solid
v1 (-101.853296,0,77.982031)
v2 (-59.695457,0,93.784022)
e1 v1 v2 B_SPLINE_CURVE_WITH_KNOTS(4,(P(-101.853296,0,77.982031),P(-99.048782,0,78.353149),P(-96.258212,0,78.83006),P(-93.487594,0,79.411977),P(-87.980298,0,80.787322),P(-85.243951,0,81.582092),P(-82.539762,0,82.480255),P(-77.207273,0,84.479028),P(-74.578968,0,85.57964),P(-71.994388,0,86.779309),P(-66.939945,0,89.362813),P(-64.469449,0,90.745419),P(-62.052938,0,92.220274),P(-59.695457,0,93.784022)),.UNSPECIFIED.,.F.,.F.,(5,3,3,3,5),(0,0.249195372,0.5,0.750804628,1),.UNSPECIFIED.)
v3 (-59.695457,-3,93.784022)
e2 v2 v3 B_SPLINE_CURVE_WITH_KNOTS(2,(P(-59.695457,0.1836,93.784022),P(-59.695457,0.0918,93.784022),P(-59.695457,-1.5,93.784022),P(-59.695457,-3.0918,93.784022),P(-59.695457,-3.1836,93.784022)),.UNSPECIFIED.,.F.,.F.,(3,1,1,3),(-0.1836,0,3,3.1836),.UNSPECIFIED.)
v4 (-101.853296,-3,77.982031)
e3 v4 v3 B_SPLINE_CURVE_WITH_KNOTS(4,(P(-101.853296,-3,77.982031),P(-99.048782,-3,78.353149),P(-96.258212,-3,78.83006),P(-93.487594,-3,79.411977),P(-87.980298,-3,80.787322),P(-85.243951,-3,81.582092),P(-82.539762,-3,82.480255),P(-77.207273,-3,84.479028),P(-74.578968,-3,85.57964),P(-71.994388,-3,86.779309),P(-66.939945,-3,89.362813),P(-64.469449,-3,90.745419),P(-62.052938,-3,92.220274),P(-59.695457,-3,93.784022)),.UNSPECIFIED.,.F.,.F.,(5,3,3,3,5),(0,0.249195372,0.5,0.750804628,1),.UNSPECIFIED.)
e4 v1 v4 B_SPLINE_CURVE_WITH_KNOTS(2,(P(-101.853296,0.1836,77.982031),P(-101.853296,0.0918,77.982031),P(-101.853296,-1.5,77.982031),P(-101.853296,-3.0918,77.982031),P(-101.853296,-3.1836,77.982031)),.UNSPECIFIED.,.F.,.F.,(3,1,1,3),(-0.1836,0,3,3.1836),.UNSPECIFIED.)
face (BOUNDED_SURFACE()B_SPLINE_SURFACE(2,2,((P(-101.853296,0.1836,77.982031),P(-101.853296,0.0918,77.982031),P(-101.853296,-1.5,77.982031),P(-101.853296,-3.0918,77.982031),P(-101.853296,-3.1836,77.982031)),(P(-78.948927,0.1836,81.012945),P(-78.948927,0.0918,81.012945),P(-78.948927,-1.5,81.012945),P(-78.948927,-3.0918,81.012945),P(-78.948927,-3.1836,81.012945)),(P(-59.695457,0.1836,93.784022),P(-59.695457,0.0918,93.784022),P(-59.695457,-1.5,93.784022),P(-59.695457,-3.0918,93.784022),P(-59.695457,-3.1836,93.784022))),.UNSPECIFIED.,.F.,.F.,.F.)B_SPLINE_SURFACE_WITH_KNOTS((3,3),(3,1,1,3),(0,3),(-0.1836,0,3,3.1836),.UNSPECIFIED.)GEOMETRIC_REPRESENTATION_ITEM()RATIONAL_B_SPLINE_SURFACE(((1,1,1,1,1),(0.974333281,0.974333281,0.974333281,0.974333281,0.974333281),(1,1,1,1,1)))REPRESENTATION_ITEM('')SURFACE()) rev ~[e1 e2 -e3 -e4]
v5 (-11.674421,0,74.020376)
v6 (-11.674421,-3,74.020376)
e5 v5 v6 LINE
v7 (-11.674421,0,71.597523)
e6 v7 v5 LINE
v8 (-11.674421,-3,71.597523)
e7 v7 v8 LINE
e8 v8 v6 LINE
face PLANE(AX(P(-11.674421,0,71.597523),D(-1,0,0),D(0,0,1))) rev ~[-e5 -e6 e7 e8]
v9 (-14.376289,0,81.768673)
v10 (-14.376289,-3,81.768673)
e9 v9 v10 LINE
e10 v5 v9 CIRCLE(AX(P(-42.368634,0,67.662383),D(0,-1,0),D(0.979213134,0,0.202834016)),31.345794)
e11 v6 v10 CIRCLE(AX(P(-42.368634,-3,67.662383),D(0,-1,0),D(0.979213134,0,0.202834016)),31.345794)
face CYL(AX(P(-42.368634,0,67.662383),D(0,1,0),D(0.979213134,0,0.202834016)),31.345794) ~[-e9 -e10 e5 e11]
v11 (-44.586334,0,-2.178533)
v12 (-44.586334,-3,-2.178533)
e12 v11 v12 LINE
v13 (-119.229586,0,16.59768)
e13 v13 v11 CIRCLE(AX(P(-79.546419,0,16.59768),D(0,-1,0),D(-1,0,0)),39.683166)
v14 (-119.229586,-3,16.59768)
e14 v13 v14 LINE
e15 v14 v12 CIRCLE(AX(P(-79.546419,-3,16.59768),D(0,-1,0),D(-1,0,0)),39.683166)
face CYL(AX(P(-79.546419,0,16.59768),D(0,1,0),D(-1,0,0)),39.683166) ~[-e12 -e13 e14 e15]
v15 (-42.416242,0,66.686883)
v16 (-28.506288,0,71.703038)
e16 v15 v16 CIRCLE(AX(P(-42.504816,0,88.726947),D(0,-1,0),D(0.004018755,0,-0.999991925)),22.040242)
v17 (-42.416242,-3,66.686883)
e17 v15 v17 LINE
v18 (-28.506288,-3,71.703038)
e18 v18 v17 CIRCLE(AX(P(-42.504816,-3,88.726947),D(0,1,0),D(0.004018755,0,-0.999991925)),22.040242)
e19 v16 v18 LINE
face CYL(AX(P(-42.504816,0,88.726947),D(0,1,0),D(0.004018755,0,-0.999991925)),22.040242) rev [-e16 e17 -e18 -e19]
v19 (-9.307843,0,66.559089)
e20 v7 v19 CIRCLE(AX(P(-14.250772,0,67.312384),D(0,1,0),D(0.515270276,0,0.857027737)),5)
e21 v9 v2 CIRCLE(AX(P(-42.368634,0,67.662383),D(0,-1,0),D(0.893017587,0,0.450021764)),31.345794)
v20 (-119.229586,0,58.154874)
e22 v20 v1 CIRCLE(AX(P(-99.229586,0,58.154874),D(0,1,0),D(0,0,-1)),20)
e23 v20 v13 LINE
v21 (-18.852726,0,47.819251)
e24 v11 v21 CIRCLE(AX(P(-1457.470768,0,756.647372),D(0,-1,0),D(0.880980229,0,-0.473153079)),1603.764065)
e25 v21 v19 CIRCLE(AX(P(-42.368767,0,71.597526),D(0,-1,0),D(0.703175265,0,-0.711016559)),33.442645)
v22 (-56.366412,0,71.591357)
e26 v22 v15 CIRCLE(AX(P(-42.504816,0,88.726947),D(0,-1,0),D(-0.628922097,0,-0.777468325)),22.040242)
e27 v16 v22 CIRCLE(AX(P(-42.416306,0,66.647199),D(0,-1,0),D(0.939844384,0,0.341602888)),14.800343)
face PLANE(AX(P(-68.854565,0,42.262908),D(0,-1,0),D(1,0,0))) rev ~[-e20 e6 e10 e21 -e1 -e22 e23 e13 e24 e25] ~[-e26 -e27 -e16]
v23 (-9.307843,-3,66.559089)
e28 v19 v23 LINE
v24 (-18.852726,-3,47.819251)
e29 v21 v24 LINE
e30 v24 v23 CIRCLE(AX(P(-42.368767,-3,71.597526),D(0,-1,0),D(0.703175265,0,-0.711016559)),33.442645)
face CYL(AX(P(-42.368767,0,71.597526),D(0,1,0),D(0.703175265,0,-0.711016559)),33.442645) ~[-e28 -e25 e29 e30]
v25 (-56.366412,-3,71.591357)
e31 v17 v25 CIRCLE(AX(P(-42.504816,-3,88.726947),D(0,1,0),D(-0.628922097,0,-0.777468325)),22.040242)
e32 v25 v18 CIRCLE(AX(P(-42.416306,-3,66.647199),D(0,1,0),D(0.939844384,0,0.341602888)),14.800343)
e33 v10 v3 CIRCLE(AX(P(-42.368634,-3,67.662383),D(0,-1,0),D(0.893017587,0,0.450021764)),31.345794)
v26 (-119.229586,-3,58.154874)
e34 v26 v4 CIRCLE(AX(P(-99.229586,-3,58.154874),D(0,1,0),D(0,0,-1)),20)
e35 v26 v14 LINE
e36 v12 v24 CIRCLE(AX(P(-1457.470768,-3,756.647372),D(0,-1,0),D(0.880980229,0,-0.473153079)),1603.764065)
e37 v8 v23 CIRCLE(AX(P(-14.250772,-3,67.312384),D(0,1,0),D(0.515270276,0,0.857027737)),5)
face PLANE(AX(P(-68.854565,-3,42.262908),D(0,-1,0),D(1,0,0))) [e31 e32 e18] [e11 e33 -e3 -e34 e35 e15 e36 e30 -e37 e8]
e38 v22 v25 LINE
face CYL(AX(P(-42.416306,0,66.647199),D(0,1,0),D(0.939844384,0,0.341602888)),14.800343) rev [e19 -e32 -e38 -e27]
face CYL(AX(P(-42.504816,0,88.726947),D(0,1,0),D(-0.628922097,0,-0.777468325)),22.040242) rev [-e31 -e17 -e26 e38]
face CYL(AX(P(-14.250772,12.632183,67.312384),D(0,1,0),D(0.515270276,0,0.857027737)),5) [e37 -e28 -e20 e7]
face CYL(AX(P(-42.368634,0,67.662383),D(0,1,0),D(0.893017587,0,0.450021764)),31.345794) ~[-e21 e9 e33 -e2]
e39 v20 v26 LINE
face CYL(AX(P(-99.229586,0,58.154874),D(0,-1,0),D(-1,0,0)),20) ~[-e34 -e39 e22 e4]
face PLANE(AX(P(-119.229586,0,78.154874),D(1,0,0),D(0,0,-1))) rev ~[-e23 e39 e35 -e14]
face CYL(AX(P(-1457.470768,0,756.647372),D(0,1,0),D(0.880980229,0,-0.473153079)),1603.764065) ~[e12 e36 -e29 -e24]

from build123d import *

# Parameters (mm, degrees)
F1_DEPTH    = 3
F2_DEPTH    = 25
F3_R        = 20
F4_R        = 100
F5_T1_DEPTH = 28.2643660281


# Not quite as in the source:
# - a fillet or chamfer that OpenCascade refuses, or shapes differently, is made with other operations: its cross-section is extruded or revolved along the edge and cut away or added


with BuildPart() as f1:
    # F0 (on Front) → F1 (new body)
    with BuildSketch(Plane.XZ):
        with BuildLine():
            ThreePointArc((-119.2295857728, 16.5976797057), (-89.2269882152, -21.8866064143), (-44.5863344816, -2.1785326218))
            ThreePointArc((-44.5863344816, -2.1785326218), (-31.5003837254, 22.7075657451), (-18.8527258188, 47.819251244))
            ThreePointArc((-18.8527258188, 47.819251244), (-11.5073907558, 58.7139707042), (-8.9261215756, 71.5975225718))
            Line((-8.9261215756, 71.5975225718), (-11.67442069, 71.5975225718))
            Line((-11.67442069, 71.5975225718), (-11.67442069, 74.0203762137))
            ThreePointArc((-11.67442069, 74.0203762137), (-12.7707106261, 77.9833199576), (-14.3762885703, 81.7686725444))
            ThreePointArc((-14.3762885703, 81.7686725444), (-44.33377908, 98.9465167224), (-71.9061774941, 78.1548738354))
            Line((-71.9061774941, 78.1548738354), (-107.2845857728, 78.1548738354))
            Line((-107.2845857728, 78.1548738354), (-119.2295857728, 78.1548738354))
            Line((-119.2295857728, 78.1548738354), (-119.2295857728, 66.2098738354))
            Line((-119.2295857728, 66.2098738354), (-119.2295857728, 16.5976797057))
        make_face()
        with BuildLine():
            ThreePointArc((-26.6928125913, 79.0930187933), (-24.6315082315, 75.5227380173), (-23.3711215756, 71.597523888))
            Line((-23.3711215756, 71.597523888), (-20.8711215756, 71.5975236602))
            ThreePointArc((-20.8711215756, 71.5975236602), (-22.8939959961, 62.4935676044), (-28.5819229469, 55.1029300277))
            ThreePointArc((-28.5819229469, 55.1029300277), (-41.6104278008, 29.1671780434), (-55.1096433175, 3.4732809051))
            ThreePointArc((-55.1096433175, 3.4732809051), (-86.3130475025, -10.3024804429), (-107.2845857728, 16.5976797057))
            Line((-107.2845857728, 16.5976797057), (-107.2845857728, 66.2098738354))
            Line((-107.2845857728, 66.2098738354), (-104.7845857728, 66.2098738354))
            Line((-104.7845857728, 66.2098738354), (-68.5864427672, 66.2098738354))
            Line((-68.5864427672, 66.2098738354), (-63.1803487139, 66.2098738354))
            ThreePointArc((-63.1803487139, 66.2098738354), (-63.6941147242, 68.8812286524), (-63.8664115811, 71.5960777945))
            Line((-63.8664115811, 71.5960777945), (-61.3664115868, 71.5962461647))
            ThreePointArc((-61.3664115868, 71.5962461647), (-46.4685424734, 86.625019162), (-26.6928125913, 79.0930187933))
        make_face(mode=Mode.SUBTRACT)
        with BuildLine():
            ThreePointArc((-32.7025071715, 52.3956462756), (-51.243606048, 52.0172813271), (-63.1803487139, 66.2098738354))
            Line((-63.1803487139, 66.2098738354), (-68.5864427672, 66.2098738354))
            Line((-68.5864427672, 66.2098738354), (-104.7845857728, 66.2098738354))
            Line((-104.7845857728, 66.2098738354), (-104.7845857728, 16.5976797057))
            ThreePointArc((-104.7845857728, 16.5976797057), (-85.7031813006, -7.8780087034), (-57.3120938901, 4.6561636023))
            ThreePointArc((-57.3120938901, 4.6561636023), (-44.8056231456, 28.4219407394), (-32.7025071715, 52.3956462756))
        make_face()
        with BuildLine():
            ThreePointArc((-61.3664115868, 71.5962461647), (-42.368127741, 52.5998806027), (-23.3711215756, 71.597523888))
            Line((-23.3711215756, 71.597523888), (-28.5062876117, 71.7030383349))
            ThreePointArc((-28.5062876117, 71.7030383348), (-35.0280474509, 67.9936357913), (-42.4162418184, 66.6868830916))
            ThreePointArc((-42.4162418184, 66.6868830916), (-49.8149115034, 67.9342855665), (-56.3664115866, 71.5913571683))
            Line((-56.3664115866, 71.5913571683), (-61.3664115868, 71.5962461647))
        make_face()
        with BuildLine():
            ThreePointArc((-55.1096433175, 3.4732809051), (-41.6104278008, 29.1671780434), (-28.5819229469, 55.1029300277))
            ThreePointArc((-28.5819229469, 55.1029300277), (-30.5643455059, 53.6307678626), (-32.7025071715, 52.3956462756))
            ThreePointArc((-32.7025071715, 52.3956462756), (-44.8056231456, 28.4219407394), (-57.3120938901, 4.6561636023))
            ThreePointArc((-57.3120938901, 4.6561636023), (-85.7031813006, -7.8780087034), (-104.7845857728, 16.5976797057))
            Line((-104.7845857728, 16.5976797057), (-104.7845857728, 66.2098738354))
            Line((-104.7845857728, 66.2098738354), (-107.2845857728, 66.2098738354))
            Line((-107.2845857728, 66.2098738354), (-107.2845857728, 16.5976797057))
            ThreePointArc((-107.2845857728, 16.5976797057), (-86.3130475025, -10.3024804429), (-55.1096433175, 3.4732809051))
        make_face()
        with BuildLine():
            ThreePointArc((-42.4162418184, 66.6868830916), (-35.0280474509, 67.9936357913), (-28.5062876117, 71.7030383348))
            ThreePointArc((-28.5062876117, 71.7030383349), (-42.4756351565, 81.447422187), (-56.3664115866, 71.5913571683))
            ThreePointArc((-56.3664115866, 71.5913571683), (-49.8149115034, 67.9342855665), (-42.4162418184, 66.6868830916))
        make_face()
        with BuildLine():
            Line((-28.5062876117, 71.7030383349), (-23.3711215756, 71.597523888))
            ThreePointArc((-23.3711215756, 71.597523888), (-24.6315082315, 75.5227380173), (-26.6928125913, 79.0930187933))
            ThreePointArc((-26.6928125913, 79.0930187933), (-46.4685424734, 86.625019162), (-61.3664115868, 71.5962461647))
            Line((-61.3664115868, 71.5962461647), (-56.3664115866, 71.5913571683))
            ThreePointArc((-56.3664115866, 71.5913571683), (-42.4756351565, 81.447422187), (-28.5062876117, 71.7030383349))
        make_face()
        with BuildLine():
            Line((-20.8711215756, 71.5975236602), (-23.3711215756, 71.597523888))
            ThreePointArc((-23.3711215756, 71.597523888), (-42.368127741, 52.5998806027), (-61.3664115868, 71.5962461647))
            Line((-61.3664115868, 71.5962461647), (-63.8664115811, 71.5960777945))
            ThreePointArc((-63.8664115811, 71.5960777945), (-63.6941147242, 68.8812286524), (-63.1803487139, 66.2098738354))
            ThreePointArc((-63.1803487139, 66.2098738354), (-51.243606048, 52.0172813271), (-32.7025071715, 52.3956462756))
            ThreePointArc((-32.7025071715, 52.3956462756), (-30.5643455059, 53.6307678626), (-28.5819229469, 55.1029300277))
            ThreePointArc((-28.5819229469, 55.1029300277), (-22.8939959961, 62.4935676044), (-20.8711215756, 71.5975236602))
        make_face()
    extrude(amount=F1_DEPTH)

    # F0 (on Front) → F2 (cut)
    with BuildSketch(Plane.XZ):
        with BuildLine():
            ThreePointArc((-42.4162418184, 66.6868830916), (-35.0280474509, 67.9936357913), (-28.5062876117, 71.7030383348))
            ThreePointArc((-28.5062876117, 71.7030383349), (-42.4756351565, 81.447422187), (-56.3664115866, 71.5913571683))
            ThreePointArc((-56.3664115866, 71.5913571683), (-49.8149115034, 67.9342855665), (-42.4162418184, 66.6868830916))
        make_face()
    extrude(amount=F2_DEPTH, mode=Mode.SUBTRACT)

    # F3
    f3_edges = [f1.edges().sort_by_distance(p)[0] for p in [
        (-119.229586, -1.5, 78.154874),
    ]]
    fillet(f3_edges, radius=F3_R)

    # F4
    f4_edges = [f1.edges().sort_by_distance(p)[0] for p in [
        (-71.906177, -1.5, 78.154874),
    ]]
    fillet(f4_edges, radius=F4_R)

    # F5: fillet of radius 5 on 1 edges, made by hand

    # F5_s2 → F5_t1 (cut)
    with BuildSketch(Plane.XZ.offset(-12.632183014)):
        with BuildLine():
            ThreePointArc((-11.67442069, 71.5975225718), (-9.7251397256, 69.4380959712), (-9.3078431517, 66.5590886613))
            ThreePointArc((-9.3078431517, 66.5590886613), (-9.0216886325, 69.0710859777), (-8.9261215756, 71.5975225718))
            Line((-8.9261215756, 71.5975225718), (-11.67442069, 71.5975225718))
        make_face()
    extrude(amount=F5_T1_DEPTH, mode=Mode.SUBTRACT)


solid = f1.part
